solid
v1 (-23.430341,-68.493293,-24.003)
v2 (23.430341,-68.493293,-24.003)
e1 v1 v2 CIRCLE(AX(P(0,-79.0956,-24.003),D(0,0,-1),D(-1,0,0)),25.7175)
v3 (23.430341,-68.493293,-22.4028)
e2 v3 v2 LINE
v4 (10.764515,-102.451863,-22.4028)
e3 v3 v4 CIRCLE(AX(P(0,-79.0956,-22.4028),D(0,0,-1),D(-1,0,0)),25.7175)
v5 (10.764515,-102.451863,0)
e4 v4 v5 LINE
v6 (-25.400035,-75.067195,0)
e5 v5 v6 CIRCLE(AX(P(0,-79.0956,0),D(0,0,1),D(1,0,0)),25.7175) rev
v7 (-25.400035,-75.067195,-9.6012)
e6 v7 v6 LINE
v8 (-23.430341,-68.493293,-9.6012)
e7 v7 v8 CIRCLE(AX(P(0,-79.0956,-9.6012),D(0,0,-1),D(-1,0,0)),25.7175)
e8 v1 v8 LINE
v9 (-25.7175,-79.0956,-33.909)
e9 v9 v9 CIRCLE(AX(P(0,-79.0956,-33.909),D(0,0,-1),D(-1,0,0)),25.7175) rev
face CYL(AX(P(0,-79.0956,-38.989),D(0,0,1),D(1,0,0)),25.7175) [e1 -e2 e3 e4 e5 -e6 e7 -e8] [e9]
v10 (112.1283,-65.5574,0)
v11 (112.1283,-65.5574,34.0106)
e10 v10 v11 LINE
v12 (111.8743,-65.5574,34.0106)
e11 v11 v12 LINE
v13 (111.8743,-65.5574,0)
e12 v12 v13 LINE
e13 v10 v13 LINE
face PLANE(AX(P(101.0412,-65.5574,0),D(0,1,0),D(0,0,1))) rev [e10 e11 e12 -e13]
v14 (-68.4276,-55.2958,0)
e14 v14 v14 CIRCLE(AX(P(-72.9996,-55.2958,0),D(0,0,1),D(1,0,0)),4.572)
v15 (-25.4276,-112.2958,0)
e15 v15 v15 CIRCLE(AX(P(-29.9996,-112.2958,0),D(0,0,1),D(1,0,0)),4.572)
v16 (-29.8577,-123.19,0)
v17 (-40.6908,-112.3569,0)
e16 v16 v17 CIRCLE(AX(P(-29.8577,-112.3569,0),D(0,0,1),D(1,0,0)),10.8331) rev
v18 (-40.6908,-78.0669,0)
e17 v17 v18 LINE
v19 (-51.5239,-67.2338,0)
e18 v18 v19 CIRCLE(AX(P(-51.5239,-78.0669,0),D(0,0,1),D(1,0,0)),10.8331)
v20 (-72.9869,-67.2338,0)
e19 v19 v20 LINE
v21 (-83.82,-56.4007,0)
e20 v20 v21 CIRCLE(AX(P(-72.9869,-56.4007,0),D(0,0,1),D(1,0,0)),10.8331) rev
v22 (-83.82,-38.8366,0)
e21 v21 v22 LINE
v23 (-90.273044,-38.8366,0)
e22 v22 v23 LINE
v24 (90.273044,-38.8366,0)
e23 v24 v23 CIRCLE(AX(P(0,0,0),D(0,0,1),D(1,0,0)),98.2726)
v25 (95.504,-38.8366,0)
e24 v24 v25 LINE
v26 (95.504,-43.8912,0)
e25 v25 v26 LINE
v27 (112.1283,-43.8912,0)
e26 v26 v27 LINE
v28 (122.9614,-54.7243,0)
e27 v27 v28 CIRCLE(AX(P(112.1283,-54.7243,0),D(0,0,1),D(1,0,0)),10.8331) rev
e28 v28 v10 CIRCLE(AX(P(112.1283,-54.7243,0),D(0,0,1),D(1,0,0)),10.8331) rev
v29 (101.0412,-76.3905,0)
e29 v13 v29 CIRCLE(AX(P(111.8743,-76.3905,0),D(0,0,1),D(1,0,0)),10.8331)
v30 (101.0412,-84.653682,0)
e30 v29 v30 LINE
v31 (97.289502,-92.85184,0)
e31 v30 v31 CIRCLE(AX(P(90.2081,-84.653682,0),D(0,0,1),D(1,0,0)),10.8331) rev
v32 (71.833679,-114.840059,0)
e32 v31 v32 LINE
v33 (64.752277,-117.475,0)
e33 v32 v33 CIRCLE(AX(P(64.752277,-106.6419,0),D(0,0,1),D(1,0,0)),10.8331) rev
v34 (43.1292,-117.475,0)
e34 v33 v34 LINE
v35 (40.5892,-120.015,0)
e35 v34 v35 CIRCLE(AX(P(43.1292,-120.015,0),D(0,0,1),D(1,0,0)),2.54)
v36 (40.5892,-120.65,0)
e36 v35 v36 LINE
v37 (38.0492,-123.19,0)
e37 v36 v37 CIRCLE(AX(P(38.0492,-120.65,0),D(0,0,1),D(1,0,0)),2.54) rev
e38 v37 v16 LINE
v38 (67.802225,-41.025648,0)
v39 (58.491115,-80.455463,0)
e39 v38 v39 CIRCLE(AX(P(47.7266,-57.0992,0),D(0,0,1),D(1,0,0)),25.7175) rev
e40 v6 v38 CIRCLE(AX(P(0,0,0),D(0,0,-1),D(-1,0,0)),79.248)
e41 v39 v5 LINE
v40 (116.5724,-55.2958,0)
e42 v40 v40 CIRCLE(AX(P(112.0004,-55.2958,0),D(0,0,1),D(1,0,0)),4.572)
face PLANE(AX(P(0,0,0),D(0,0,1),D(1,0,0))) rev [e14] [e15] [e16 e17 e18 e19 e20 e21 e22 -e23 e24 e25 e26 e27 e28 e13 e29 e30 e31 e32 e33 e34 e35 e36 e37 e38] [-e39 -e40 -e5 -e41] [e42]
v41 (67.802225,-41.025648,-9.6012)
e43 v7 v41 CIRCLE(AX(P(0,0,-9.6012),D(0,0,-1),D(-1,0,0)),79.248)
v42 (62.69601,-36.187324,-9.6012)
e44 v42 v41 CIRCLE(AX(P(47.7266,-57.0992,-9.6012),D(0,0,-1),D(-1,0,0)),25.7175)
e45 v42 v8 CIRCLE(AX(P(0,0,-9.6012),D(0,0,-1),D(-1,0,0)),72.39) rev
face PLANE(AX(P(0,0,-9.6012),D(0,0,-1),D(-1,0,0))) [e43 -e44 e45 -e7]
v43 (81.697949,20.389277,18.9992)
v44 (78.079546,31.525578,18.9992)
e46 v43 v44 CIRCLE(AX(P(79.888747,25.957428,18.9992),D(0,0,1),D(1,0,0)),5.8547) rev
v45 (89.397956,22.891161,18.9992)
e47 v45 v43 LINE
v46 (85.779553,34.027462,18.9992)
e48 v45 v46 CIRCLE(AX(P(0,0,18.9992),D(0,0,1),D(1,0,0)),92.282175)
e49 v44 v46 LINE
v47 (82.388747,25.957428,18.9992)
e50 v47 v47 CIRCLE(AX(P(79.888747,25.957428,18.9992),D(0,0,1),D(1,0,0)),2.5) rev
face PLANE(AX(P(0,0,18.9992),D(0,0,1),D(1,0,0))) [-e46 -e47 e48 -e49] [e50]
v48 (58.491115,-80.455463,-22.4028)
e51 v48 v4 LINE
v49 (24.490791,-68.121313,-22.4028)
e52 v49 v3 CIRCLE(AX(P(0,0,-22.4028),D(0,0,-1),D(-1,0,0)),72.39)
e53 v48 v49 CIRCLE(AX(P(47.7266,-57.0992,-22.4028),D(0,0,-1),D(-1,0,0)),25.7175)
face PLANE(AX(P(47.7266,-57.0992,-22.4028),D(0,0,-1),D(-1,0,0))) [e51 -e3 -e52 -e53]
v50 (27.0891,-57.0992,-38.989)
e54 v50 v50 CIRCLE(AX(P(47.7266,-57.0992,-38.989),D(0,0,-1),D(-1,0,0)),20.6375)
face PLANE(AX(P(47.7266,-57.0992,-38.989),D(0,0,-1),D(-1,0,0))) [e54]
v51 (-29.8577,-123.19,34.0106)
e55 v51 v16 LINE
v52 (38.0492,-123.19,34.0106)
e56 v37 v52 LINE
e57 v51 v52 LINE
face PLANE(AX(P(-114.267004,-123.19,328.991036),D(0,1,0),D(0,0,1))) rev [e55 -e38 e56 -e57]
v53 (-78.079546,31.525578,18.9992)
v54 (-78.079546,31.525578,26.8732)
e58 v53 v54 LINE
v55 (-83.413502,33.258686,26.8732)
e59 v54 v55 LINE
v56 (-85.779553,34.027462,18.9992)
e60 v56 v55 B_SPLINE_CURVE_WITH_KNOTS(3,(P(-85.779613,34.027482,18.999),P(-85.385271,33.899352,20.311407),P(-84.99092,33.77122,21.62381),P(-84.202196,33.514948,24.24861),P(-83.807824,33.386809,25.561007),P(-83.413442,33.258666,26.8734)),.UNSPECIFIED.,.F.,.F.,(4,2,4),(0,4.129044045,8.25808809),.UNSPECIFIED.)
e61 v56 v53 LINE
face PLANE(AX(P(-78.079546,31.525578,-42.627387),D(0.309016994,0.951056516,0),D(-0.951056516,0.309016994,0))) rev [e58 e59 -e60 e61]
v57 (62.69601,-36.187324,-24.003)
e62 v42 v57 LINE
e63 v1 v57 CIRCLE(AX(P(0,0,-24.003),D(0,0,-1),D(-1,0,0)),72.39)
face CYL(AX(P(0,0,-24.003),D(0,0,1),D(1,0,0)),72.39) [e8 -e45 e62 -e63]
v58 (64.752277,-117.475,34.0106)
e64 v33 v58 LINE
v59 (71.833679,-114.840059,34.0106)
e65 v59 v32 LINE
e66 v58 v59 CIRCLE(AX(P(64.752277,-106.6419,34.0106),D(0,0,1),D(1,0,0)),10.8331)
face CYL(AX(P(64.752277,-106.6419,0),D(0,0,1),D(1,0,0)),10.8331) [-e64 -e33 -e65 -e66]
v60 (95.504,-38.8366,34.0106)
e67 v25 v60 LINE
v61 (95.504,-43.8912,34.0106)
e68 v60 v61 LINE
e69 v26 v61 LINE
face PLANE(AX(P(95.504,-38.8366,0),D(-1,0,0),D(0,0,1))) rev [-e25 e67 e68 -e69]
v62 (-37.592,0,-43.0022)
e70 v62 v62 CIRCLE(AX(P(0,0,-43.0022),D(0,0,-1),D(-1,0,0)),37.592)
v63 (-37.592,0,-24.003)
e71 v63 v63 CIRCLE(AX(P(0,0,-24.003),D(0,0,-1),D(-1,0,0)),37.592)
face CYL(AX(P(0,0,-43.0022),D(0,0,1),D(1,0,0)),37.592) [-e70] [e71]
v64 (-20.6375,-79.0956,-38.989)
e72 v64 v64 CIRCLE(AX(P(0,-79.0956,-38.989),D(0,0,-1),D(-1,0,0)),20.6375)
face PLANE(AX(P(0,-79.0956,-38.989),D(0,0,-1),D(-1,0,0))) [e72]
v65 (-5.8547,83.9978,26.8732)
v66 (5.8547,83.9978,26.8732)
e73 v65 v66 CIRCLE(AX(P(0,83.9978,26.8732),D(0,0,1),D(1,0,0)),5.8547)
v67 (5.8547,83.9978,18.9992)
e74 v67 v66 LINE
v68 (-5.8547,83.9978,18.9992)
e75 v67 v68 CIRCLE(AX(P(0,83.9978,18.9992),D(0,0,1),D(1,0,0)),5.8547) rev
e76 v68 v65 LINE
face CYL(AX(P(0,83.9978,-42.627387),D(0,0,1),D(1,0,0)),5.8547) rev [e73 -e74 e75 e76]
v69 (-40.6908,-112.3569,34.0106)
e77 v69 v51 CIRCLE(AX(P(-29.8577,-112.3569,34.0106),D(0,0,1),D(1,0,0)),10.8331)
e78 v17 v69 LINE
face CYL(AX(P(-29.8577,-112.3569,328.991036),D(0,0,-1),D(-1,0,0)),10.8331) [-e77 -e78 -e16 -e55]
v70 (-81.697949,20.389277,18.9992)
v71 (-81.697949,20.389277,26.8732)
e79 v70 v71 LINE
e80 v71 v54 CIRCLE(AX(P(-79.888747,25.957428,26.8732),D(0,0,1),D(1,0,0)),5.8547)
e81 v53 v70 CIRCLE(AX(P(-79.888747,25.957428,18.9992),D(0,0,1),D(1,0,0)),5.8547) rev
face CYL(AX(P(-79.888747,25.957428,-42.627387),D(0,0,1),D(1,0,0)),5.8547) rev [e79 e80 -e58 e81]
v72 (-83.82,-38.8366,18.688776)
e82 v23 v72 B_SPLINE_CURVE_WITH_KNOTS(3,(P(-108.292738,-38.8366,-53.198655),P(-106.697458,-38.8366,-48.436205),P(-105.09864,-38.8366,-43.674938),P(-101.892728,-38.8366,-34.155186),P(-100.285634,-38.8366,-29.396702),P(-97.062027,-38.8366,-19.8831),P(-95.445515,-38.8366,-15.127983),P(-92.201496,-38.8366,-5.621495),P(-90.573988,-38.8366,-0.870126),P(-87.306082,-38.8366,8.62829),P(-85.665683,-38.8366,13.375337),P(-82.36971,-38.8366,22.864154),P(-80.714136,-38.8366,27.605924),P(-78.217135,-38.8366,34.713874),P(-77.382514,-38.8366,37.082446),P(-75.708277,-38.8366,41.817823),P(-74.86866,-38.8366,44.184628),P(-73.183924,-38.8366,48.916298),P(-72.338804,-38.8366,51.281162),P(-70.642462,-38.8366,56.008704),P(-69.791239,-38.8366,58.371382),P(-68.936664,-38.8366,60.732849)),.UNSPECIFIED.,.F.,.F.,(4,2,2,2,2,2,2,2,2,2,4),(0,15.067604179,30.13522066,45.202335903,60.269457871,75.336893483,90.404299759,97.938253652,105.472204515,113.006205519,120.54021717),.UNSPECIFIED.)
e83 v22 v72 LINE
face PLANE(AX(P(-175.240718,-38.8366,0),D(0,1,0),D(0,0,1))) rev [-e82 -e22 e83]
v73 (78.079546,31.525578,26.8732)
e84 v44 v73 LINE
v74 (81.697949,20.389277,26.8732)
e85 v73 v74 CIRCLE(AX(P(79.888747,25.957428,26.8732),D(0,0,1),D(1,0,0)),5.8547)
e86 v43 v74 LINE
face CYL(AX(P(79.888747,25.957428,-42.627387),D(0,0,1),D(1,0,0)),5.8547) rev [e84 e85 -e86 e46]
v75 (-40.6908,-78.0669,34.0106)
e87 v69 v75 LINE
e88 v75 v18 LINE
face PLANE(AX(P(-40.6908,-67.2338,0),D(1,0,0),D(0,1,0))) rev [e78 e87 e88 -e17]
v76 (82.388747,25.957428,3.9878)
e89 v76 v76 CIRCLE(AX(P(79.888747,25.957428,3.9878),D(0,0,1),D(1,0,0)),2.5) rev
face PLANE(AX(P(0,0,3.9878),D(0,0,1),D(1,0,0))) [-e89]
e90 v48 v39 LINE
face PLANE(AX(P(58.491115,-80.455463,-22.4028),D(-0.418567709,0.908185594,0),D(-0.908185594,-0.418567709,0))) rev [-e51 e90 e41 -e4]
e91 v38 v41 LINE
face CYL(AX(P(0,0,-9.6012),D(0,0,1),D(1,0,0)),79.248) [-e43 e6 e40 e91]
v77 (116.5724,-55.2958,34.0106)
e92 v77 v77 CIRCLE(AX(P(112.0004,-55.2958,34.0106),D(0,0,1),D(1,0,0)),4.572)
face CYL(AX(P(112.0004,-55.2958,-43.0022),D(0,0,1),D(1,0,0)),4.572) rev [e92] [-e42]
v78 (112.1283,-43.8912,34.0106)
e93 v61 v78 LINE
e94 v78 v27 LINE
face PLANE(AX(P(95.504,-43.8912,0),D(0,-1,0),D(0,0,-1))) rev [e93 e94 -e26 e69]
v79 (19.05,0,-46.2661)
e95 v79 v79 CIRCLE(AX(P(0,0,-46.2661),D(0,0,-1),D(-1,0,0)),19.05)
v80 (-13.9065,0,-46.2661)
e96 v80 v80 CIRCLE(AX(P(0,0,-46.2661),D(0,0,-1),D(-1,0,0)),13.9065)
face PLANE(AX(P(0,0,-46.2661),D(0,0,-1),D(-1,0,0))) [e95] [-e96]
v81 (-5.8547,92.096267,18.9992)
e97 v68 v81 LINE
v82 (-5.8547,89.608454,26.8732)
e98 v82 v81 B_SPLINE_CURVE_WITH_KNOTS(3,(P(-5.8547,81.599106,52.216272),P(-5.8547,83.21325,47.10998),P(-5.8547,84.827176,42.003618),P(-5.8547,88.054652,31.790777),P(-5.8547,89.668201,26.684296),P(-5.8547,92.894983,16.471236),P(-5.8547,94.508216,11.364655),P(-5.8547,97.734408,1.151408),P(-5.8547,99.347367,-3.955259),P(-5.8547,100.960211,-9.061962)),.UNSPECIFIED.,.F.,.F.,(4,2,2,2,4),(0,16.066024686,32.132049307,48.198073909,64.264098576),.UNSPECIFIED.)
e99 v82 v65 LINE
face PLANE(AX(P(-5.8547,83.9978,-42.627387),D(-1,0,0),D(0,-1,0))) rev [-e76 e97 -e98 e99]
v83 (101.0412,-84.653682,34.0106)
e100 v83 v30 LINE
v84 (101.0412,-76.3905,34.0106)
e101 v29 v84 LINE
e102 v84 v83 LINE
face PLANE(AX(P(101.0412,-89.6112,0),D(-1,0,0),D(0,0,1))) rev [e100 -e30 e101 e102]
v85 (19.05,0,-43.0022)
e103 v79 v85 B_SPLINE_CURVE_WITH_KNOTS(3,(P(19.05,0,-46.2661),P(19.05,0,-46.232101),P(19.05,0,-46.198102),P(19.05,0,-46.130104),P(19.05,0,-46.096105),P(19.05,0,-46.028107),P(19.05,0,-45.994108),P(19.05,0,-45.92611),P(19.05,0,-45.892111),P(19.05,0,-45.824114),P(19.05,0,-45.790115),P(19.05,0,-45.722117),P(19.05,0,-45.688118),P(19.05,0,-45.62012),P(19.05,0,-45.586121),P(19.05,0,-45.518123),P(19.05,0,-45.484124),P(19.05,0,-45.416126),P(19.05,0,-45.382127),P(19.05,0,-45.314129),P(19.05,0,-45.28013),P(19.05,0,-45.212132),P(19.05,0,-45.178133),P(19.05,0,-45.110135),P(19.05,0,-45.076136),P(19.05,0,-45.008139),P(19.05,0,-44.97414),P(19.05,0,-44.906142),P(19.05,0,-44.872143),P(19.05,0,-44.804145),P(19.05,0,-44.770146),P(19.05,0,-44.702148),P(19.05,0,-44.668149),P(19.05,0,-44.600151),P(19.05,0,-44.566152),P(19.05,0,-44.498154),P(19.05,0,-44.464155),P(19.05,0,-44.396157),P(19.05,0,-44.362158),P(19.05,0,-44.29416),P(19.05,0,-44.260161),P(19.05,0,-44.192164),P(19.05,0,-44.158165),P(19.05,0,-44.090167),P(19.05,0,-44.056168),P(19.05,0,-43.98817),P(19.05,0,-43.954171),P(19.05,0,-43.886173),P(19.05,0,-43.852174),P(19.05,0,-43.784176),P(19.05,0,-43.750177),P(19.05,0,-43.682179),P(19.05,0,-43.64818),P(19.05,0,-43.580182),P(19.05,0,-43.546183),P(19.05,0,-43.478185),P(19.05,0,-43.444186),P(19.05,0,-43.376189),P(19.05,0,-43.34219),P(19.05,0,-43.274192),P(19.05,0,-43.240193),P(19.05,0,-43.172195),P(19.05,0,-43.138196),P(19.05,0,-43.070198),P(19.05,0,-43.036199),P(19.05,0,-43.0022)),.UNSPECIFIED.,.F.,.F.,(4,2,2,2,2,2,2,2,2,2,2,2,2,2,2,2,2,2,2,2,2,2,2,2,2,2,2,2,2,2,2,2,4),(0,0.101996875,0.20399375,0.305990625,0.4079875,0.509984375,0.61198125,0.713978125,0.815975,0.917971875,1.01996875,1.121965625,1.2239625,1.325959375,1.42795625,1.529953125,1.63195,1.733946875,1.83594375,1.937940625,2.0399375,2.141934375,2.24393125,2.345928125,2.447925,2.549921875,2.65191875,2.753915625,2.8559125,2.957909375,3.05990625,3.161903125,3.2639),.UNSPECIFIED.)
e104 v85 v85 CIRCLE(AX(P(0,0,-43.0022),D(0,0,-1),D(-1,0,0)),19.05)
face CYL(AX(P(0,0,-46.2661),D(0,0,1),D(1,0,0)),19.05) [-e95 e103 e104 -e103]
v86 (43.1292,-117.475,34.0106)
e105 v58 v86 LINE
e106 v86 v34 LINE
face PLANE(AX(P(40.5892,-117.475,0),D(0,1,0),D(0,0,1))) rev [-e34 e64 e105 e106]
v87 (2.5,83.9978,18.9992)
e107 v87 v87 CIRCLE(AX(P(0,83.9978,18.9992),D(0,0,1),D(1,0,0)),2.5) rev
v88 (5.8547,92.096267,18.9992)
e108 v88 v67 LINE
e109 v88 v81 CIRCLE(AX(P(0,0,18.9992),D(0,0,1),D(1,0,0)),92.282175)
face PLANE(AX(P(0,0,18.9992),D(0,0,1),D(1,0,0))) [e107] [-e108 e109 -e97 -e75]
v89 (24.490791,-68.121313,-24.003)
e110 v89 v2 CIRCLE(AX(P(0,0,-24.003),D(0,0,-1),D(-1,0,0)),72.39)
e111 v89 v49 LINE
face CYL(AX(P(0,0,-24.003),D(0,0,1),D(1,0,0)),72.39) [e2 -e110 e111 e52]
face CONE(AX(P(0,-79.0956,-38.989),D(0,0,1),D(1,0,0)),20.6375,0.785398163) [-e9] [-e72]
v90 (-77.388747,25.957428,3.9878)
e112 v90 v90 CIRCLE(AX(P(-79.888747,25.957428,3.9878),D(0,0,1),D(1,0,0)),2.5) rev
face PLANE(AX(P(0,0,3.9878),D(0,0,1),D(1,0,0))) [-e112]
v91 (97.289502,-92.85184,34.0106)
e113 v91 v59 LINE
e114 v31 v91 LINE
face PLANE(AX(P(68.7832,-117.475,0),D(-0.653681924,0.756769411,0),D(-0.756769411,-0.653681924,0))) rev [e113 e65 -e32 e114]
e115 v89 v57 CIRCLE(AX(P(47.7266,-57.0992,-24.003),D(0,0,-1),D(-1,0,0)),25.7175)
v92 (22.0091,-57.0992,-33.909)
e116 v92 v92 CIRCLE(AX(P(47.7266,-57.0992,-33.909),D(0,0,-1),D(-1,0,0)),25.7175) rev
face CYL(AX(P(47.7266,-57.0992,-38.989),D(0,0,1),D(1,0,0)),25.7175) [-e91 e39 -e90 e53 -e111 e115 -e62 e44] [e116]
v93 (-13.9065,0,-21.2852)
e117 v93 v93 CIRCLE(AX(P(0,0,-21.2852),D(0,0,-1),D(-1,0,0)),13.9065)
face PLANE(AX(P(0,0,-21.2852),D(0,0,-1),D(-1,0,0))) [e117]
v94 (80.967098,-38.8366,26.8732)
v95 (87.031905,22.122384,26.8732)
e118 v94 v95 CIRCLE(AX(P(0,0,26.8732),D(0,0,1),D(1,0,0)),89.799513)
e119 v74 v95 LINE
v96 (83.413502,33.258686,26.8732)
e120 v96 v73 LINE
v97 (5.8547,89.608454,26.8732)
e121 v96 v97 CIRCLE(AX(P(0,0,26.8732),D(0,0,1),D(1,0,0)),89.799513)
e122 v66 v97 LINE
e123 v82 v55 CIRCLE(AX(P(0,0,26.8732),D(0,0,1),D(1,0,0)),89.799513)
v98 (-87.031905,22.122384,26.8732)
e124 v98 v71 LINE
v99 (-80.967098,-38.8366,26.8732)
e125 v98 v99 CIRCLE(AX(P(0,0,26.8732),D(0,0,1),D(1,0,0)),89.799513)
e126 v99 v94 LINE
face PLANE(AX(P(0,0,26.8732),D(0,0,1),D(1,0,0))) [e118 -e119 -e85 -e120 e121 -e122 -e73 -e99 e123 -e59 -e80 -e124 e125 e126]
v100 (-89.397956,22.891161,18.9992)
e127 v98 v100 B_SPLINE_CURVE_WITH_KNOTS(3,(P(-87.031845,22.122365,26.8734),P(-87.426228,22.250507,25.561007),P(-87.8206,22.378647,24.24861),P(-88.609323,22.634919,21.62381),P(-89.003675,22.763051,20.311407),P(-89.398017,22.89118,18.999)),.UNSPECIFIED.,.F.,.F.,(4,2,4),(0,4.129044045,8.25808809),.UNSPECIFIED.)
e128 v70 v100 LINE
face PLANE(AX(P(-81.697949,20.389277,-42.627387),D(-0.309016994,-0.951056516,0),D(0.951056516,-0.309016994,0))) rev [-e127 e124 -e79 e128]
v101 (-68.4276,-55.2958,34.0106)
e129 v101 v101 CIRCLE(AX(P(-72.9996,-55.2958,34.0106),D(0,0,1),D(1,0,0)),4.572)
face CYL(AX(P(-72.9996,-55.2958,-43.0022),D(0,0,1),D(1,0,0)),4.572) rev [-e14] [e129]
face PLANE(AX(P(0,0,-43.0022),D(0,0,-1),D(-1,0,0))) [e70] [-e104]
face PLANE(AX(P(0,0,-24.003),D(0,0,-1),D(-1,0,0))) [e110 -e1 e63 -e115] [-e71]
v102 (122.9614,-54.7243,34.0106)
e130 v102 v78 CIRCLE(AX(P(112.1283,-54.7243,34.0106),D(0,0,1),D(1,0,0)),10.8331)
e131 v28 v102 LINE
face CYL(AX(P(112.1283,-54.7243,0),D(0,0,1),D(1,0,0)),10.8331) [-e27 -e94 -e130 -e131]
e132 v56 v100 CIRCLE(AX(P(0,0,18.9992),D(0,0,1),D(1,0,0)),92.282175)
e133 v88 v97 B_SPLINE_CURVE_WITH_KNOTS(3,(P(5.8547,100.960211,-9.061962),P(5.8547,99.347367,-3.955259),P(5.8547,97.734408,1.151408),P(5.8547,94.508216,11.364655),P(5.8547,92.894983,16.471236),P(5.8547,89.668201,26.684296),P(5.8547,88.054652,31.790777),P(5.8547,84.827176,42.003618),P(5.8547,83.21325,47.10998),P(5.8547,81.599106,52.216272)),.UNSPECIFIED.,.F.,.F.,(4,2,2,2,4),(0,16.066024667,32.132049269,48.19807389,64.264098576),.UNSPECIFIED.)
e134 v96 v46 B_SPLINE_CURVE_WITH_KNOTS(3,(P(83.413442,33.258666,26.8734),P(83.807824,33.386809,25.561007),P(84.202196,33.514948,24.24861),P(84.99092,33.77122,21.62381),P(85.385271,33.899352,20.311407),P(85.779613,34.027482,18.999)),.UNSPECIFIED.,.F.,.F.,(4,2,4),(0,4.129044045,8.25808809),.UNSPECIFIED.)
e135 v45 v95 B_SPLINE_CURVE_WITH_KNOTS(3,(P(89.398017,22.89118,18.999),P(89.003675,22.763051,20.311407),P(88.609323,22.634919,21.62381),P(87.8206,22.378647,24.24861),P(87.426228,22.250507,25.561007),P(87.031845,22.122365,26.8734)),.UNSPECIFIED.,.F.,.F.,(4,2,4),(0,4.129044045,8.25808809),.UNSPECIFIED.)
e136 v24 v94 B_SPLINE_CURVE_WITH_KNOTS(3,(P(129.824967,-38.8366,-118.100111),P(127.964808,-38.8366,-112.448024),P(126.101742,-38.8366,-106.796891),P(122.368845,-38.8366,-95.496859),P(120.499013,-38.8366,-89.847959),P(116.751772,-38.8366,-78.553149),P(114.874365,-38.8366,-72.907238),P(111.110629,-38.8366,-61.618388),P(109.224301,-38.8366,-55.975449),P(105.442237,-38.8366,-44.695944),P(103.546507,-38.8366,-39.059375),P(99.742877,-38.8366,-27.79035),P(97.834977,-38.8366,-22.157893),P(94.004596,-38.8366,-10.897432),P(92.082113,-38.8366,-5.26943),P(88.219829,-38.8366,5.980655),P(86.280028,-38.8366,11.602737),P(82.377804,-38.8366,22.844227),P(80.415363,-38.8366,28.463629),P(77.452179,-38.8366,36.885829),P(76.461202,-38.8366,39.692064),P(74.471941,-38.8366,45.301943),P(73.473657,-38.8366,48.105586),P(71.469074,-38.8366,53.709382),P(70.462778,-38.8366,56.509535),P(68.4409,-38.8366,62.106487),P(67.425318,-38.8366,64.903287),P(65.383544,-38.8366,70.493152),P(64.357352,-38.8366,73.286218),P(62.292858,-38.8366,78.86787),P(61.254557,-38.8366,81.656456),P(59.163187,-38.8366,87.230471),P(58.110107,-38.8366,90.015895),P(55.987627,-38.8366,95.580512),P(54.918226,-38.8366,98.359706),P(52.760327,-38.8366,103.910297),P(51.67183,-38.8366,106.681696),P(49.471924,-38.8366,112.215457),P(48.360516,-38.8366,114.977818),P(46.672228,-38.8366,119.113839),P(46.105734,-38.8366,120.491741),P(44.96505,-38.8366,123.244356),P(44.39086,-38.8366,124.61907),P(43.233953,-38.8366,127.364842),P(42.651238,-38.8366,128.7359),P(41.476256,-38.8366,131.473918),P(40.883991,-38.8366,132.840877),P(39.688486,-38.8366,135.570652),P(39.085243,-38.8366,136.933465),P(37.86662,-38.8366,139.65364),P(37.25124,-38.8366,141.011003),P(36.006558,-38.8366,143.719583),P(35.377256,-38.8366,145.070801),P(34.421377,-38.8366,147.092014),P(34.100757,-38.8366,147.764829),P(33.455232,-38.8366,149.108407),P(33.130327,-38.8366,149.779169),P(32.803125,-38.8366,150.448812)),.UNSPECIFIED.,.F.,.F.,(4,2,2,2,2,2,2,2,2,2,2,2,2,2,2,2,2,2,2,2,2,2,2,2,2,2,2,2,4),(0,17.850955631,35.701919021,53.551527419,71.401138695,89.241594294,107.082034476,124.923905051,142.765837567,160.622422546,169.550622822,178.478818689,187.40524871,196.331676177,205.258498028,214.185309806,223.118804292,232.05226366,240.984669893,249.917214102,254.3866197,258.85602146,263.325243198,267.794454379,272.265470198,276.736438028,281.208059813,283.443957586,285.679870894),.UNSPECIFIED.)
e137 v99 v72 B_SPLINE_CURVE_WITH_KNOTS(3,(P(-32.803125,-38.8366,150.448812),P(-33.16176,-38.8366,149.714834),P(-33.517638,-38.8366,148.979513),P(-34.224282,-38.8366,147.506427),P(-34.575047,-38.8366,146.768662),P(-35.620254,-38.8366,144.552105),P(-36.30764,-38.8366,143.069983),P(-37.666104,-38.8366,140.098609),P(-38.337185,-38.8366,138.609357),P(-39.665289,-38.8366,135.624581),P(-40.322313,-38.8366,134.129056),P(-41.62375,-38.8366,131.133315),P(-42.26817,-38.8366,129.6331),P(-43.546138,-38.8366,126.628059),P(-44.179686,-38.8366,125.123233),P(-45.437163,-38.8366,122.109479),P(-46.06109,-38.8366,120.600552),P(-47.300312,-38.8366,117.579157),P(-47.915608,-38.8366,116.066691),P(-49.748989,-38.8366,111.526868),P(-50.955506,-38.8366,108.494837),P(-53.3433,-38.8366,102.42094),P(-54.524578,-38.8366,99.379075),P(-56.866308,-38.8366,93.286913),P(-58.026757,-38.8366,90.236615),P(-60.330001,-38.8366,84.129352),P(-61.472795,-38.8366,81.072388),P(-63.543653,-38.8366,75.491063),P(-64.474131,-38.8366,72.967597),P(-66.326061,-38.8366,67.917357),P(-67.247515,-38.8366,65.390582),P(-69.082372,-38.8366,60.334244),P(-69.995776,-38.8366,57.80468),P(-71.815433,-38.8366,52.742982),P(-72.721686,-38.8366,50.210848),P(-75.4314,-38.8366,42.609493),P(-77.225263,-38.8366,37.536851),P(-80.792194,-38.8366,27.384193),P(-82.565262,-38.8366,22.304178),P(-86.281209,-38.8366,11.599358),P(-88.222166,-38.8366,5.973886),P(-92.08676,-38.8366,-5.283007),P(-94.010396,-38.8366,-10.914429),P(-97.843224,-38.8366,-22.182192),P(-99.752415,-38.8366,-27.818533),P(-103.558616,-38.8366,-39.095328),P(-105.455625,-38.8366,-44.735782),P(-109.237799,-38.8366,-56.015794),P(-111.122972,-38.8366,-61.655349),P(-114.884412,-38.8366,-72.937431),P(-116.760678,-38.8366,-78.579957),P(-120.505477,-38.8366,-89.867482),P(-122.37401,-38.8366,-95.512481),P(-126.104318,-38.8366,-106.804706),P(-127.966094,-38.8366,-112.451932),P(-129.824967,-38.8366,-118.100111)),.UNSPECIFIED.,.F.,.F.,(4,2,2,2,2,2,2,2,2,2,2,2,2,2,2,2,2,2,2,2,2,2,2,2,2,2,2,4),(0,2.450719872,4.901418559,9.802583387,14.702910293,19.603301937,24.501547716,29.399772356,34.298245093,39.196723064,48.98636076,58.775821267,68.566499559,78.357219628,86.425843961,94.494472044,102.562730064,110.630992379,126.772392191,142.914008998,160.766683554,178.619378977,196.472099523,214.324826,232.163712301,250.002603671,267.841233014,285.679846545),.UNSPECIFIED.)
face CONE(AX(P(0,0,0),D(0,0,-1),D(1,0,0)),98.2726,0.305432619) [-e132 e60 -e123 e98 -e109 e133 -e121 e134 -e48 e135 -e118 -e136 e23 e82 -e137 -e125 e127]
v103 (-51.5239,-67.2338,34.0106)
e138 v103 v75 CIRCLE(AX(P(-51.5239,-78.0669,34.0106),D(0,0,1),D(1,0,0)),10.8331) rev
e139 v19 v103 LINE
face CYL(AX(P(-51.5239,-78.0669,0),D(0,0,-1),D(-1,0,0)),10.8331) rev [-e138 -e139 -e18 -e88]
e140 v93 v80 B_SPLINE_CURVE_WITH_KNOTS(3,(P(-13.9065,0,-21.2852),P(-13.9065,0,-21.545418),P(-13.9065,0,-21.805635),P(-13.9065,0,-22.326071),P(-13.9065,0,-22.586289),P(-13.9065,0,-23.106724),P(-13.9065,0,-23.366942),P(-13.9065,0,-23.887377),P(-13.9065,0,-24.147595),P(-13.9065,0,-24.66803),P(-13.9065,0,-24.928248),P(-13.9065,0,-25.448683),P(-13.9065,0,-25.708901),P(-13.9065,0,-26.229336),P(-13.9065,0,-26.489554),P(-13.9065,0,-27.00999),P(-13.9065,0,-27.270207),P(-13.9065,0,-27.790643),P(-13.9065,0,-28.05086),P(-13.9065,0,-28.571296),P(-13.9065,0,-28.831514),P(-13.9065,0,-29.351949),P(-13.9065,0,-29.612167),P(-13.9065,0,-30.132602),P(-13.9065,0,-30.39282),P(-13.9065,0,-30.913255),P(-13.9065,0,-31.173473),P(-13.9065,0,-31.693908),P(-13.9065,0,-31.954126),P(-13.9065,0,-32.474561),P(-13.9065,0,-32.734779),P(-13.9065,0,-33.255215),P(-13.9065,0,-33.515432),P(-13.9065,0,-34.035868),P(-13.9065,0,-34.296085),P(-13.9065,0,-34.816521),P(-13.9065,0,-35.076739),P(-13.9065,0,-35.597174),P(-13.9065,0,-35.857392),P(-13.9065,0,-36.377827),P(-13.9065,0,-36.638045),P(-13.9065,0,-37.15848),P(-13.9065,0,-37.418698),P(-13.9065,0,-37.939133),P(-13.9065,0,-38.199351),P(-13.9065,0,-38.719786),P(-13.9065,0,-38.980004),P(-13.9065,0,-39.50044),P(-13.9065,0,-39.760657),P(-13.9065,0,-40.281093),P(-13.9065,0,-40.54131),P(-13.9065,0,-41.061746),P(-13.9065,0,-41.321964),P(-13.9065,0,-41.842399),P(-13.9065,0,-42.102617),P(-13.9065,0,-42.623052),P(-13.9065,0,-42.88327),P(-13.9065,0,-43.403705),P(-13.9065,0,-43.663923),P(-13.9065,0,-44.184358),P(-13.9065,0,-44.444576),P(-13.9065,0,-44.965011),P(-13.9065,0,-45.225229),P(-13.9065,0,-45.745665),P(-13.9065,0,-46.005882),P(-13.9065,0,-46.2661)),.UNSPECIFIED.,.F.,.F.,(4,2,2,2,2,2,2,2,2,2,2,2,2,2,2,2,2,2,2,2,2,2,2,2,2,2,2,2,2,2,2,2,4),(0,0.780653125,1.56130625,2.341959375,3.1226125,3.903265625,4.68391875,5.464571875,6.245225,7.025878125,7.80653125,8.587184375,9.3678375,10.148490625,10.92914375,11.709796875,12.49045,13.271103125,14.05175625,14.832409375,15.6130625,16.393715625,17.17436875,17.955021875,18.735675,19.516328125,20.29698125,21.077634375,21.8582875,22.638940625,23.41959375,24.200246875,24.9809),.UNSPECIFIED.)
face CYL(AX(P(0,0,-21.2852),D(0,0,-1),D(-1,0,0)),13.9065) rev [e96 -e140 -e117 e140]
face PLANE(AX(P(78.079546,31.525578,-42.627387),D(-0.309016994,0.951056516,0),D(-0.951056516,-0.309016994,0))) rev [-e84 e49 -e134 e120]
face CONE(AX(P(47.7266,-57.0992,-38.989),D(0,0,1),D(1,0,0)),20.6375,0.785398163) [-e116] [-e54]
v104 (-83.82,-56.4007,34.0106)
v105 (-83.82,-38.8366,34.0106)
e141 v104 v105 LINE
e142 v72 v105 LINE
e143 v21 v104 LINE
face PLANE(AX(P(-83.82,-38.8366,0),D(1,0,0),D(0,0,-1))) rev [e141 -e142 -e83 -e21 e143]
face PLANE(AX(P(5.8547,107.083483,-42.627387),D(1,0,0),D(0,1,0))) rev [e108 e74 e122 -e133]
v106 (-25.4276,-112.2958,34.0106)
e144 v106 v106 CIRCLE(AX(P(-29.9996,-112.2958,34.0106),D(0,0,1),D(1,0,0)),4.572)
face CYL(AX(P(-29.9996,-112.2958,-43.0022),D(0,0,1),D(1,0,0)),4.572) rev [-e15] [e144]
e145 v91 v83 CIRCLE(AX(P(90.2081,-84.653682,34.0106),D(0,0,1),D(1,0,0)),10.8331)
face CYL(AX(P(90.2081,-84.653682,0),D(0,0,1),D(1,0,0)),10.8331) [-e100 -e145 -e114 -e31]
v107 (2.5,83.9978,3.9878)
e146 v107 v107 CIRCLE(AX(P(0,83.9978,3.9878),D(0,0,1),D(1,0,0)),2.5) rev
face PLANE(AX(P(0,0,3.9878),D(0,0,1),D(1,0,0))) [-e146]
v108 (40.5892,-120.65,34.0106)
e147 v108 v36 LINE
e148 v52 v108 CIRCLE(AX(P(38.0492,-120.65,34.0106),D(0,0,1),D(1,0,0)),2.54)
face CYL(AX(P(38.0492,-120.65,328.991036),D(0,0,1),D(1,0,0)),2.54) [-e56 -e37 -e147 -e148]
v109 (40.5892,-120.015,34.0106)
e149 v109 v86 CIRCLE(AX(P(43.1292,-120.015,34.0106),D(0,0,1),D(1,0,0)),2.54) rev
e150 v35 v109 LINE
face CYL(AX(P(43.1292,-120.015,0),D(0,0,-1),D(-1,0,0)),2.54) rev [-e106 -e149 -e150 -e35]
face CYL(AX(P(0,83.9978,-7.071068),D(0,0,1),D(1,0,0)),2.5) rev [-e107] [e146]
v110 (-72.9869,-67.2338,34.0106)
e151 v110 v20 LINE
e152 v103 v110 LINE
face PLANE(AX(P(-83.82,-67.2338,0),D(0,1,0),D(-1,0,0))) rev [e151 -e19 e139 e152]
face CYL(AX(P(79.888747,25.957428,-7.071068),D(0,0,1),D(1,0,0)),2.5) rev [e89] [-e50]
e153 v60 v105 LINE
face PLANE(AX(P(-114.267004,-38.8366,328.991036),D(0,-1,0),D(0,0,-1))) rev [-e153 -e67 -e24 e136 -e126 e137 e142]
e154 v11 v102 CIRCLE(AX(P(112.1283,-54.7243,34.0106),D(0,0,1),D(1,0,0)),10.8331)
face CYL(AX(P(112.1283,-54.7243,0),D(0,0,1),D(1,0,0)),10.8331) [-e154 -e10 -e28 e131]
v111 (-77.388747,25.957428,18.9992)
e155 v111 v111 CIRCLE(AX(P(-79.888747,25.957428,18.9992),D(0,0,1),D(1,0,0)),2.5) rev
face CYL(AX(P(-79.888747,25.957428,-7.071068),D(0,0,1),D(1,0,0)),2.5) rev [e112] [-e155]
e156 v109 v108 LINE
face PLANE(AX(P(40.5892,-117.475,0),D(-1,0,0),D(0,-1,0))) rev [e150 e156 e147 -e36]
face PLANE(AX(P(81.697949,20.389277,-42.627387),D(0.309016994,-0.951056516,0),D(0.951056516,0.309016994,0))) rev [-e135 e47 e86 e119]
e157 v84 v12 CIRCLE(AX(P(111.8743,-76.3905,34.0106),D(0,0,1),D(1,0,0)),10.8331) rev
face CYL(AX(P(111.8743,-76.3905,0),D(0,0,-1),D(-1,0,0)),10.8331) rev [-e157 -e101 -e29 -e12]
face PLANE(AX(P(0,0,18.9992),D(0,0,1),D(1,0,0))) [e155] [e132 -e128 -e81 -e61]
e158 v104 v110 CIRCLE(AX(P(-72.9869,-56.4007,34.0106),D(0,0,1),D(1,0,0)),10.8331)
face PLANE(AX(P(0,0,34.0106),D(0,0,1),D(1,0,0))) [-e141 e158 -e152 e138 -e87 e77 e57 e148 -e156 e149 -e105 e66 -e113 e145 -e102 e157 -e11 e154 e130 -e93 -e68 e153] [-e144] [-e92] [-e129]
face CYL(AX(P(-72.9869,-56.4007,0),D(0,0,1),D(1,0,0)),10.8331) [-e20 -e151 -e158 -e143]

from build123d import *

# Parameters (mm, degrees)
SKETCH1_R                  = 98.2726
EXTRUDE1_DEPTH             = 26.8732
EXTRUDE1_TAPER             = 17.5
SKETCH2_R                  = 2.5
EXTRUDE2_DEPTH             = 22.8854
EXTRUDE3_DEPTH             = 7.874
SKETCH4_W                  = 246.961047875
SKETCH4_H                  = 84.3534
EXTRUDE4_DEPTH             = 7.1374
EXTRUDE4_DIRECTION_2_REACH = 143.553
EXTRUDE5_DEPTH             = 34.0106
EXTRUDE6_DEPTH             = 34.0106
SKETCH8_R                  = 25.7175
EXTRUDE7_DEPTH             = 38.989
SKETCH9_R                  = 79.248
EXTRUDE9_DEPTH             = 9.6012
SKETCH10_R                 = 72.39
EXTRUDE10_DEPTH            = 14.4018
SKETCH11_R                 = 37.592
EXTRUDE11_DEPTH            = 18.9992
SKETCH12_R                 = 13.9065
EXTRUDE12_DEPTH            = 21.717
EXTRUDE13_DEPTH            = 22.4028
CHAMFER1_SIZE              = 5.08
FILLET1_R                  = 10.8331
FILLET2_R                  = 2.54
SKETCH17_R                 = 4.572
EXTRUDE14_DEPTH            = 191.331955682
EXTRUDE15_START            = 3.2639
SKETCH18_R                 = 19.05
SKETCH18_R_2               = 13.9065
EXTRUDE15_DEPTH            = 3.2639


with BuildPart() as part:
    # Sketch1 → Extrude1 (new body)
    with BuildSketch(Plane.XY):
        Circle(SKETCH1_R)
    extrude(amount=EXTRUDE1_DEPTH, taper=EXTRUDE1_TAPER)

    # Sketch2 → Extrude2 (cut)
    with BuildSketch(Plane.XY.offset(26.8732)):
        with Locations((0, 83.9978)):
            Circle(SKETCH2_R)
        with Locations((-79.888747369, 25.957427527)):
            Circle(SKETCH2_R)
        with Locations((79.888747369, 25.957427527)):
            Circle(SKETCH2_R)
    extrude(amount=-EXTRUDE2_DEPTH, mode=Mode.SUBTRACT)

    # Sketch3 → Extrude3 (cut)
    with BuildSketch(Plane.XY.offset(26.8732)):
        with BuildLine():
            Line((-5.8547, 83.9978), (-5.8547, 107.083482694))
            Line((-5.8547, 107.083482694), (5.8547, 107.083482694))
            Line((5.8547, 107.083482694), (5.8547, 83.9978))
            ThreePointArc((5.8547, 83.9978), (0, 78.1431), (-5.8547, 83.9978))
        make_face()
        with BuildLine():
            Line((78.079545572, 31.525578113), (107.519879311, 41.091322409))
            Line((107.519879311, 41.091322409), (110.140650445, 33.912588651))
            Line((110.140650445, 33.912588651), (111.136243984, 29.954358751))
            Line((111.136243984, 29.954358751), (81.697949166, 20.389276942))
            ThreePointArc((81.697949166, 20.389276942), (74.320596783, 24.148225731), (78.079545572, 31.525578113))
        make_face()
        with BuildLine():
            Line((-78.079545572, 31.525578113), (-100.241812355, 38.726535104))
            Line((-100.241812355, 38.726535104), (-103.860215949, 27.590233933))
            Line((-103.860215949, 27.590233933), (-81.697949166, 20.389276942))
            ThreePointArc((-81.697949166, 20.389276942), (-74.320596783, 24.148225731), (-78.079545572, 31.525578113))
        make_face()
    extrude(amount=-EXTRUDE3_DEPTH, mode=Mode.SUBTRACT)

    # Sketch4 → Extrude4 (add)
    with BuildSketch(Plane.XY.offset(26.8732)):
        with Locations((9.213520109, -81.0133)):
            Rectangle(SKETCH4_W, SKETCH4_H)
    extrude(amount=EXTRUDE4_DEPTH)

    # Extrude4 direction 2: up to this face of the body (flat: up to its plane)
    extrude4_direction_2_end = Plane(part.part.faces().sort_by_distance((0, 0, 0))[0])
    # Sketch4 → Extrude4 direction 2 (add, up to the picked face)
    with BuildSketch(Plane.XY.offset(26.8732), mode=Mode.PRIVATE) as extrude4_direction_2_sk1:
        with Locations((9.213520109, -81.0133)):
            Rectangle(SKETCH4_W, SKETCH4_H)
    extrude4_direction_2_tool1 = split(extrude(extrude4_direction_2_sk1.sketch, amount=-EXTRUDE4_DIRECTION_2_REACH, mode=Mode.PRIVATE), bisect_by=extrude4_direction_2_end, keep=Keep.BOTH, mode=Mode.PRIVATE)
    add(extrude4_direction_2_tool1.solids().sort_by(Axis((9.21352, -81.0133, 26.8732), (0, 0, -1)))[0])

    # Sketch5 → Extrude5 (cut)
    with BuildSketch(Plane.XY.offset(34.0106)):
        Polygon((-83.82, -67.2338), (-40.6908, -67.2338), (-40.6908, -176.31524759), (-133.730255454, -176.31524759), (-133.730255454, -141.532127837), (-175.240717896, -141.532127837), (-175.240717896, -38.8366), (-83.82, -38.8366), align=None)
    extrude(amount=-EXTRUDE5_DEPTH, mode=Mode.SUBTRACT)

    # Sketch6 → Extrude6 (cut)
    with BuildSketch(Plane.XY.offset(34.0106)):
        Polygon((40.5892, -117.475), (68.7832, -117.475), (101.0412, -89.6112), (101.0412, -65.5574), (122.9614, -65.5574), (122.9614, -43.8912), (95.504, -43.8912), (95.504, -38.8366), (122.9614, -38.8366), (122.9614, 0), (187.241229942, 0), (187.241229942, -89.6112), (148.373467802, -89.6112), (148.373467802, -112.172308269), (148.373467802, -172.462981515), (68.7832, -172.462981515), (40.5892, -172.462981515), align=None)
    extrude(amount=-EXTRUDE6_DEPTH, mode=Mode.SUBTRACT)

    # Sketch8 → Extrude7 (add)
    with BuildSketch(Plane(origin=(0, 0, 0), x_dir=(-1, 0, 0), z_dir=(0, 0, -1))):
        with Locations(Location((0, -79.0956, 0), (0, 0, 180))):
            Circle(SKETCH8_R)
        with Locations(Location((-47.7266, -57.0992, 0), (0, 0, 180))):
            Circle(SKETCH8_R)
    extrude(amount=EXTRUDE7_DEPTH)

    # Sketch9 → Extrude9 (add)
    with BuildSketch(Plane(origin=(0, 0, 0), x_dir=(-1, 0, 0), z_dir=(0, 0, -1))):
        Circle(SKETCH9_R)
    extrude(amount=EXTRUDE9_DEPTH)

    # Sketch10 → Extrude10 (add)
    with BuildSketch(Plane(origin=(0, 0, -9.6012), x_dir=(-1, 0, 0), z_dir=(0, 0, -1))):
        Circle(SKETCH10_R)
    extrude(amount=EXTRUDE10_DEPTH)

    # Sketch11 → Extrude11 (add)
    with BuildSketch(Plane(origin=(0, 0, -24.003), x_dir=(-1, 0, 0), z_dir=(0, 0, -1))):
        Circle(SKETCH11_R)
    extrude(amount=EXTRUDE11_DEPTH)

    # Sketch12 → Extrude12 (cut)
    with BuildSketch(Plane(origin=(0, 0, -43.0022), x_dir=(-1, 0, 0), z_dir=(0, 0, -1))):
        Circle(SKETCH12_R)
    extrude(amount=-EXTRUDE12_DEPTH, mode=Mode.SUBTRACT)

    # Sketch13 → Extrude13 (add)
    with BuildSketch(Plane(origin=(0, 0, 0), x_dir=(-1, 0, 0), z_dir=(0, 0, -1))):
        with BuildLine():
            Line((-58.491115046, -80.455463016), (-10.764515046, -102.451863016))
            ThreePointArc((-10.764515046, -102.451863016), (23.356263016, -89.860115046), (10.764515046, -55.739336984))
            Line((10.764515046, -55.739336984), (-36.962084954, -33.742936984))
            ThreePointArc((-36.962084954, -33.742936984), (-71.082863016, -46.334684954), (-58.491115046, -80.455463016))
        make_face()
    extrude(amount=EXTRUDE13_DEPTH)

    # Chamfer1
    chamfer1_edges = [part.edges().sort_by_distance(p)[0] for p in [
        (-25.7175, -79.0956, -38.989),
        (22.0091, -57.0992, -38.989),
    ]]
    chamfer(chamfer1_edges, length=CHAMFER1_SIZE)

    # Fillet1
    # the kernel refuses this fillet: 10.8331 mm, written as the material it adds along each edge
    with BuildSketch(Plane(origin=(101.0412, -65.5574, 34.0106), x_dir=(1, 0, 0), z_dir=(0, 0, -1)), Plane(origin=(-40.6908, -67.2338, 34.0106), x_dir=(0, -1, 0), z_dir=(0, 0, -1))) as fillet1_piece_1:
        with BuildLine():
            CenterArc((FILLET1_R, FILLET1_R), FILLET1_R, 180, 90)
            Line((0, FILLET1_R), (0, 0))
            Line((0, 0), (FILLET1_R, 0))
        make_face()
    extrude(amount=34.0106)
    # the kernel refuses this fillet: 10.8331 mm, written as the material it takes off along each edge
    with BuildSketch(Plane(origin=(122.9614, -65.5574, 61.09335), x_dir=(0, 1, 0), z_dir=(0, 0, -1)), Plane(origin=(122.9614, -43.8912, 61.09335), x_dir=(-1, 0, 0), z_dir=(0, 0, -1)), Plane(origin=(-83.82, -67.2338, 61.09335), x_dir=(1, 0, 0), z_dir=(0, 0, -1))) as fillet1_2_piece_1:
        with BuildLine():
            CenterArc((FILLET1_R, -FILLET1_R), FILLET1_R, 90, 90)
            Line((0, -FILLET1_R), (0, 0))
            Line((0, 0), (FILLET1_R, 0))
        make_face()
    extrude(amount=88.1761, mode=Mode.SUBTRACT)
    with BuildSketch(Plane(origin=(101.0412, -89.6112, 46.404396211), x_dir=(0, 1, 0), z_dir=(0, 0, -1))) as fillet1_2_piece_2:
        with BuildLine():
            CenterArc((FILLET1_R * 0.457626947463, -FILLET1_R), FILLET1_R, 90, 49.180218113)
            Line((-FILLET1_R * 0.299142463693, -FILLET1_R * 0.346318075561), (0, 0))
            Line((0, 0), (FILLET1_R * 0.457626947463, 0))
        make_face()
    extrude(amount=58.798192423, mode=Mode.SUBTRACT)
    with BuildSketch(Plane(origin=(68.7832, -117.475, 44.08790669), x_dir=(0.7567694111558876, 0.6536819244393799, 0), z_dir=(0, 0, -1))) as fillet1_2_piece_3:
        with BuildLine():
            CenterArc((FILLET1_R * 0.372093184392, -FILLET1_R), FILLET1_R, 90, 40.819781887)
            Line((-FILLET1_R * 0.281588740047, -FILLET1_R * 0.243230588844), (0, 0))
            Line((0, 0), (FILLET1_R * 0.372093184392, 0))
        make_face()
    extrude(amount=54.165213379, mode=Mode.SUBTRACT)
    with BuildSketch(Plane(origin=(-40.6908, -123.19, -27.08275), x_dir=(1, 0, 0), z_dir=(0, 0, 1))) as fillet1_2_piece_4:
        with BuildLine():
            CenterArc((FILLET1_R, FILLET1_R), FILLET1_R, 180, 90)
            Line((0, FILLET1_R), (0, 0))
            Line((0, 0), (FILLET1_R, 0))
        make_face()
    extrude(amount=88.1761, mode=Mode.SUBTRACT)

    # Fillet2
    fillet2_edges = [part.edges().sort_by_distance(p)[0] for p in [
        (40.5892, -123.19, 17.0053),
        (40.5892, -117.475, 17.0053),
    ]]
    fillet(fillet2_edges, radius=FILLET2_R)

    # Sketch17 → Extrude14 (cut, through all)
    with BuildSketch(Plane.XY.offset(34.0106)):
        with Locations((-72.9996, -55.2958)):
            Circle(SKETCH17_R)
        with Locations((112.000400002, -55.2958)):
            Circle(SKETCH17_R)
        with Locations((-29.999599996, -112.295800021)):
            Circle(SKETCH17_R)
    extrude(amount=-EXTRUDE14_DEPTH, mode=Mode.SUBTRACT)

    # Sketch18 → Extrude15 (add)
    with BuildSketch(Plane(origin=(0, 0, -43.0022), x_dir=(-1, 0, 0), z_dir=(0, 0, -1)).offset(EXTRUDE15_START)):
        with Locations(Location((0, 0, 0), (0, 0, 180))):
            Circle(SKETCH18_R)
        Circle(SKETCH18_R_2, mode=Mode.SUBTRACT)
    extrude(amount=-EXTRUDE15_DEPTH)


solid = part.part
